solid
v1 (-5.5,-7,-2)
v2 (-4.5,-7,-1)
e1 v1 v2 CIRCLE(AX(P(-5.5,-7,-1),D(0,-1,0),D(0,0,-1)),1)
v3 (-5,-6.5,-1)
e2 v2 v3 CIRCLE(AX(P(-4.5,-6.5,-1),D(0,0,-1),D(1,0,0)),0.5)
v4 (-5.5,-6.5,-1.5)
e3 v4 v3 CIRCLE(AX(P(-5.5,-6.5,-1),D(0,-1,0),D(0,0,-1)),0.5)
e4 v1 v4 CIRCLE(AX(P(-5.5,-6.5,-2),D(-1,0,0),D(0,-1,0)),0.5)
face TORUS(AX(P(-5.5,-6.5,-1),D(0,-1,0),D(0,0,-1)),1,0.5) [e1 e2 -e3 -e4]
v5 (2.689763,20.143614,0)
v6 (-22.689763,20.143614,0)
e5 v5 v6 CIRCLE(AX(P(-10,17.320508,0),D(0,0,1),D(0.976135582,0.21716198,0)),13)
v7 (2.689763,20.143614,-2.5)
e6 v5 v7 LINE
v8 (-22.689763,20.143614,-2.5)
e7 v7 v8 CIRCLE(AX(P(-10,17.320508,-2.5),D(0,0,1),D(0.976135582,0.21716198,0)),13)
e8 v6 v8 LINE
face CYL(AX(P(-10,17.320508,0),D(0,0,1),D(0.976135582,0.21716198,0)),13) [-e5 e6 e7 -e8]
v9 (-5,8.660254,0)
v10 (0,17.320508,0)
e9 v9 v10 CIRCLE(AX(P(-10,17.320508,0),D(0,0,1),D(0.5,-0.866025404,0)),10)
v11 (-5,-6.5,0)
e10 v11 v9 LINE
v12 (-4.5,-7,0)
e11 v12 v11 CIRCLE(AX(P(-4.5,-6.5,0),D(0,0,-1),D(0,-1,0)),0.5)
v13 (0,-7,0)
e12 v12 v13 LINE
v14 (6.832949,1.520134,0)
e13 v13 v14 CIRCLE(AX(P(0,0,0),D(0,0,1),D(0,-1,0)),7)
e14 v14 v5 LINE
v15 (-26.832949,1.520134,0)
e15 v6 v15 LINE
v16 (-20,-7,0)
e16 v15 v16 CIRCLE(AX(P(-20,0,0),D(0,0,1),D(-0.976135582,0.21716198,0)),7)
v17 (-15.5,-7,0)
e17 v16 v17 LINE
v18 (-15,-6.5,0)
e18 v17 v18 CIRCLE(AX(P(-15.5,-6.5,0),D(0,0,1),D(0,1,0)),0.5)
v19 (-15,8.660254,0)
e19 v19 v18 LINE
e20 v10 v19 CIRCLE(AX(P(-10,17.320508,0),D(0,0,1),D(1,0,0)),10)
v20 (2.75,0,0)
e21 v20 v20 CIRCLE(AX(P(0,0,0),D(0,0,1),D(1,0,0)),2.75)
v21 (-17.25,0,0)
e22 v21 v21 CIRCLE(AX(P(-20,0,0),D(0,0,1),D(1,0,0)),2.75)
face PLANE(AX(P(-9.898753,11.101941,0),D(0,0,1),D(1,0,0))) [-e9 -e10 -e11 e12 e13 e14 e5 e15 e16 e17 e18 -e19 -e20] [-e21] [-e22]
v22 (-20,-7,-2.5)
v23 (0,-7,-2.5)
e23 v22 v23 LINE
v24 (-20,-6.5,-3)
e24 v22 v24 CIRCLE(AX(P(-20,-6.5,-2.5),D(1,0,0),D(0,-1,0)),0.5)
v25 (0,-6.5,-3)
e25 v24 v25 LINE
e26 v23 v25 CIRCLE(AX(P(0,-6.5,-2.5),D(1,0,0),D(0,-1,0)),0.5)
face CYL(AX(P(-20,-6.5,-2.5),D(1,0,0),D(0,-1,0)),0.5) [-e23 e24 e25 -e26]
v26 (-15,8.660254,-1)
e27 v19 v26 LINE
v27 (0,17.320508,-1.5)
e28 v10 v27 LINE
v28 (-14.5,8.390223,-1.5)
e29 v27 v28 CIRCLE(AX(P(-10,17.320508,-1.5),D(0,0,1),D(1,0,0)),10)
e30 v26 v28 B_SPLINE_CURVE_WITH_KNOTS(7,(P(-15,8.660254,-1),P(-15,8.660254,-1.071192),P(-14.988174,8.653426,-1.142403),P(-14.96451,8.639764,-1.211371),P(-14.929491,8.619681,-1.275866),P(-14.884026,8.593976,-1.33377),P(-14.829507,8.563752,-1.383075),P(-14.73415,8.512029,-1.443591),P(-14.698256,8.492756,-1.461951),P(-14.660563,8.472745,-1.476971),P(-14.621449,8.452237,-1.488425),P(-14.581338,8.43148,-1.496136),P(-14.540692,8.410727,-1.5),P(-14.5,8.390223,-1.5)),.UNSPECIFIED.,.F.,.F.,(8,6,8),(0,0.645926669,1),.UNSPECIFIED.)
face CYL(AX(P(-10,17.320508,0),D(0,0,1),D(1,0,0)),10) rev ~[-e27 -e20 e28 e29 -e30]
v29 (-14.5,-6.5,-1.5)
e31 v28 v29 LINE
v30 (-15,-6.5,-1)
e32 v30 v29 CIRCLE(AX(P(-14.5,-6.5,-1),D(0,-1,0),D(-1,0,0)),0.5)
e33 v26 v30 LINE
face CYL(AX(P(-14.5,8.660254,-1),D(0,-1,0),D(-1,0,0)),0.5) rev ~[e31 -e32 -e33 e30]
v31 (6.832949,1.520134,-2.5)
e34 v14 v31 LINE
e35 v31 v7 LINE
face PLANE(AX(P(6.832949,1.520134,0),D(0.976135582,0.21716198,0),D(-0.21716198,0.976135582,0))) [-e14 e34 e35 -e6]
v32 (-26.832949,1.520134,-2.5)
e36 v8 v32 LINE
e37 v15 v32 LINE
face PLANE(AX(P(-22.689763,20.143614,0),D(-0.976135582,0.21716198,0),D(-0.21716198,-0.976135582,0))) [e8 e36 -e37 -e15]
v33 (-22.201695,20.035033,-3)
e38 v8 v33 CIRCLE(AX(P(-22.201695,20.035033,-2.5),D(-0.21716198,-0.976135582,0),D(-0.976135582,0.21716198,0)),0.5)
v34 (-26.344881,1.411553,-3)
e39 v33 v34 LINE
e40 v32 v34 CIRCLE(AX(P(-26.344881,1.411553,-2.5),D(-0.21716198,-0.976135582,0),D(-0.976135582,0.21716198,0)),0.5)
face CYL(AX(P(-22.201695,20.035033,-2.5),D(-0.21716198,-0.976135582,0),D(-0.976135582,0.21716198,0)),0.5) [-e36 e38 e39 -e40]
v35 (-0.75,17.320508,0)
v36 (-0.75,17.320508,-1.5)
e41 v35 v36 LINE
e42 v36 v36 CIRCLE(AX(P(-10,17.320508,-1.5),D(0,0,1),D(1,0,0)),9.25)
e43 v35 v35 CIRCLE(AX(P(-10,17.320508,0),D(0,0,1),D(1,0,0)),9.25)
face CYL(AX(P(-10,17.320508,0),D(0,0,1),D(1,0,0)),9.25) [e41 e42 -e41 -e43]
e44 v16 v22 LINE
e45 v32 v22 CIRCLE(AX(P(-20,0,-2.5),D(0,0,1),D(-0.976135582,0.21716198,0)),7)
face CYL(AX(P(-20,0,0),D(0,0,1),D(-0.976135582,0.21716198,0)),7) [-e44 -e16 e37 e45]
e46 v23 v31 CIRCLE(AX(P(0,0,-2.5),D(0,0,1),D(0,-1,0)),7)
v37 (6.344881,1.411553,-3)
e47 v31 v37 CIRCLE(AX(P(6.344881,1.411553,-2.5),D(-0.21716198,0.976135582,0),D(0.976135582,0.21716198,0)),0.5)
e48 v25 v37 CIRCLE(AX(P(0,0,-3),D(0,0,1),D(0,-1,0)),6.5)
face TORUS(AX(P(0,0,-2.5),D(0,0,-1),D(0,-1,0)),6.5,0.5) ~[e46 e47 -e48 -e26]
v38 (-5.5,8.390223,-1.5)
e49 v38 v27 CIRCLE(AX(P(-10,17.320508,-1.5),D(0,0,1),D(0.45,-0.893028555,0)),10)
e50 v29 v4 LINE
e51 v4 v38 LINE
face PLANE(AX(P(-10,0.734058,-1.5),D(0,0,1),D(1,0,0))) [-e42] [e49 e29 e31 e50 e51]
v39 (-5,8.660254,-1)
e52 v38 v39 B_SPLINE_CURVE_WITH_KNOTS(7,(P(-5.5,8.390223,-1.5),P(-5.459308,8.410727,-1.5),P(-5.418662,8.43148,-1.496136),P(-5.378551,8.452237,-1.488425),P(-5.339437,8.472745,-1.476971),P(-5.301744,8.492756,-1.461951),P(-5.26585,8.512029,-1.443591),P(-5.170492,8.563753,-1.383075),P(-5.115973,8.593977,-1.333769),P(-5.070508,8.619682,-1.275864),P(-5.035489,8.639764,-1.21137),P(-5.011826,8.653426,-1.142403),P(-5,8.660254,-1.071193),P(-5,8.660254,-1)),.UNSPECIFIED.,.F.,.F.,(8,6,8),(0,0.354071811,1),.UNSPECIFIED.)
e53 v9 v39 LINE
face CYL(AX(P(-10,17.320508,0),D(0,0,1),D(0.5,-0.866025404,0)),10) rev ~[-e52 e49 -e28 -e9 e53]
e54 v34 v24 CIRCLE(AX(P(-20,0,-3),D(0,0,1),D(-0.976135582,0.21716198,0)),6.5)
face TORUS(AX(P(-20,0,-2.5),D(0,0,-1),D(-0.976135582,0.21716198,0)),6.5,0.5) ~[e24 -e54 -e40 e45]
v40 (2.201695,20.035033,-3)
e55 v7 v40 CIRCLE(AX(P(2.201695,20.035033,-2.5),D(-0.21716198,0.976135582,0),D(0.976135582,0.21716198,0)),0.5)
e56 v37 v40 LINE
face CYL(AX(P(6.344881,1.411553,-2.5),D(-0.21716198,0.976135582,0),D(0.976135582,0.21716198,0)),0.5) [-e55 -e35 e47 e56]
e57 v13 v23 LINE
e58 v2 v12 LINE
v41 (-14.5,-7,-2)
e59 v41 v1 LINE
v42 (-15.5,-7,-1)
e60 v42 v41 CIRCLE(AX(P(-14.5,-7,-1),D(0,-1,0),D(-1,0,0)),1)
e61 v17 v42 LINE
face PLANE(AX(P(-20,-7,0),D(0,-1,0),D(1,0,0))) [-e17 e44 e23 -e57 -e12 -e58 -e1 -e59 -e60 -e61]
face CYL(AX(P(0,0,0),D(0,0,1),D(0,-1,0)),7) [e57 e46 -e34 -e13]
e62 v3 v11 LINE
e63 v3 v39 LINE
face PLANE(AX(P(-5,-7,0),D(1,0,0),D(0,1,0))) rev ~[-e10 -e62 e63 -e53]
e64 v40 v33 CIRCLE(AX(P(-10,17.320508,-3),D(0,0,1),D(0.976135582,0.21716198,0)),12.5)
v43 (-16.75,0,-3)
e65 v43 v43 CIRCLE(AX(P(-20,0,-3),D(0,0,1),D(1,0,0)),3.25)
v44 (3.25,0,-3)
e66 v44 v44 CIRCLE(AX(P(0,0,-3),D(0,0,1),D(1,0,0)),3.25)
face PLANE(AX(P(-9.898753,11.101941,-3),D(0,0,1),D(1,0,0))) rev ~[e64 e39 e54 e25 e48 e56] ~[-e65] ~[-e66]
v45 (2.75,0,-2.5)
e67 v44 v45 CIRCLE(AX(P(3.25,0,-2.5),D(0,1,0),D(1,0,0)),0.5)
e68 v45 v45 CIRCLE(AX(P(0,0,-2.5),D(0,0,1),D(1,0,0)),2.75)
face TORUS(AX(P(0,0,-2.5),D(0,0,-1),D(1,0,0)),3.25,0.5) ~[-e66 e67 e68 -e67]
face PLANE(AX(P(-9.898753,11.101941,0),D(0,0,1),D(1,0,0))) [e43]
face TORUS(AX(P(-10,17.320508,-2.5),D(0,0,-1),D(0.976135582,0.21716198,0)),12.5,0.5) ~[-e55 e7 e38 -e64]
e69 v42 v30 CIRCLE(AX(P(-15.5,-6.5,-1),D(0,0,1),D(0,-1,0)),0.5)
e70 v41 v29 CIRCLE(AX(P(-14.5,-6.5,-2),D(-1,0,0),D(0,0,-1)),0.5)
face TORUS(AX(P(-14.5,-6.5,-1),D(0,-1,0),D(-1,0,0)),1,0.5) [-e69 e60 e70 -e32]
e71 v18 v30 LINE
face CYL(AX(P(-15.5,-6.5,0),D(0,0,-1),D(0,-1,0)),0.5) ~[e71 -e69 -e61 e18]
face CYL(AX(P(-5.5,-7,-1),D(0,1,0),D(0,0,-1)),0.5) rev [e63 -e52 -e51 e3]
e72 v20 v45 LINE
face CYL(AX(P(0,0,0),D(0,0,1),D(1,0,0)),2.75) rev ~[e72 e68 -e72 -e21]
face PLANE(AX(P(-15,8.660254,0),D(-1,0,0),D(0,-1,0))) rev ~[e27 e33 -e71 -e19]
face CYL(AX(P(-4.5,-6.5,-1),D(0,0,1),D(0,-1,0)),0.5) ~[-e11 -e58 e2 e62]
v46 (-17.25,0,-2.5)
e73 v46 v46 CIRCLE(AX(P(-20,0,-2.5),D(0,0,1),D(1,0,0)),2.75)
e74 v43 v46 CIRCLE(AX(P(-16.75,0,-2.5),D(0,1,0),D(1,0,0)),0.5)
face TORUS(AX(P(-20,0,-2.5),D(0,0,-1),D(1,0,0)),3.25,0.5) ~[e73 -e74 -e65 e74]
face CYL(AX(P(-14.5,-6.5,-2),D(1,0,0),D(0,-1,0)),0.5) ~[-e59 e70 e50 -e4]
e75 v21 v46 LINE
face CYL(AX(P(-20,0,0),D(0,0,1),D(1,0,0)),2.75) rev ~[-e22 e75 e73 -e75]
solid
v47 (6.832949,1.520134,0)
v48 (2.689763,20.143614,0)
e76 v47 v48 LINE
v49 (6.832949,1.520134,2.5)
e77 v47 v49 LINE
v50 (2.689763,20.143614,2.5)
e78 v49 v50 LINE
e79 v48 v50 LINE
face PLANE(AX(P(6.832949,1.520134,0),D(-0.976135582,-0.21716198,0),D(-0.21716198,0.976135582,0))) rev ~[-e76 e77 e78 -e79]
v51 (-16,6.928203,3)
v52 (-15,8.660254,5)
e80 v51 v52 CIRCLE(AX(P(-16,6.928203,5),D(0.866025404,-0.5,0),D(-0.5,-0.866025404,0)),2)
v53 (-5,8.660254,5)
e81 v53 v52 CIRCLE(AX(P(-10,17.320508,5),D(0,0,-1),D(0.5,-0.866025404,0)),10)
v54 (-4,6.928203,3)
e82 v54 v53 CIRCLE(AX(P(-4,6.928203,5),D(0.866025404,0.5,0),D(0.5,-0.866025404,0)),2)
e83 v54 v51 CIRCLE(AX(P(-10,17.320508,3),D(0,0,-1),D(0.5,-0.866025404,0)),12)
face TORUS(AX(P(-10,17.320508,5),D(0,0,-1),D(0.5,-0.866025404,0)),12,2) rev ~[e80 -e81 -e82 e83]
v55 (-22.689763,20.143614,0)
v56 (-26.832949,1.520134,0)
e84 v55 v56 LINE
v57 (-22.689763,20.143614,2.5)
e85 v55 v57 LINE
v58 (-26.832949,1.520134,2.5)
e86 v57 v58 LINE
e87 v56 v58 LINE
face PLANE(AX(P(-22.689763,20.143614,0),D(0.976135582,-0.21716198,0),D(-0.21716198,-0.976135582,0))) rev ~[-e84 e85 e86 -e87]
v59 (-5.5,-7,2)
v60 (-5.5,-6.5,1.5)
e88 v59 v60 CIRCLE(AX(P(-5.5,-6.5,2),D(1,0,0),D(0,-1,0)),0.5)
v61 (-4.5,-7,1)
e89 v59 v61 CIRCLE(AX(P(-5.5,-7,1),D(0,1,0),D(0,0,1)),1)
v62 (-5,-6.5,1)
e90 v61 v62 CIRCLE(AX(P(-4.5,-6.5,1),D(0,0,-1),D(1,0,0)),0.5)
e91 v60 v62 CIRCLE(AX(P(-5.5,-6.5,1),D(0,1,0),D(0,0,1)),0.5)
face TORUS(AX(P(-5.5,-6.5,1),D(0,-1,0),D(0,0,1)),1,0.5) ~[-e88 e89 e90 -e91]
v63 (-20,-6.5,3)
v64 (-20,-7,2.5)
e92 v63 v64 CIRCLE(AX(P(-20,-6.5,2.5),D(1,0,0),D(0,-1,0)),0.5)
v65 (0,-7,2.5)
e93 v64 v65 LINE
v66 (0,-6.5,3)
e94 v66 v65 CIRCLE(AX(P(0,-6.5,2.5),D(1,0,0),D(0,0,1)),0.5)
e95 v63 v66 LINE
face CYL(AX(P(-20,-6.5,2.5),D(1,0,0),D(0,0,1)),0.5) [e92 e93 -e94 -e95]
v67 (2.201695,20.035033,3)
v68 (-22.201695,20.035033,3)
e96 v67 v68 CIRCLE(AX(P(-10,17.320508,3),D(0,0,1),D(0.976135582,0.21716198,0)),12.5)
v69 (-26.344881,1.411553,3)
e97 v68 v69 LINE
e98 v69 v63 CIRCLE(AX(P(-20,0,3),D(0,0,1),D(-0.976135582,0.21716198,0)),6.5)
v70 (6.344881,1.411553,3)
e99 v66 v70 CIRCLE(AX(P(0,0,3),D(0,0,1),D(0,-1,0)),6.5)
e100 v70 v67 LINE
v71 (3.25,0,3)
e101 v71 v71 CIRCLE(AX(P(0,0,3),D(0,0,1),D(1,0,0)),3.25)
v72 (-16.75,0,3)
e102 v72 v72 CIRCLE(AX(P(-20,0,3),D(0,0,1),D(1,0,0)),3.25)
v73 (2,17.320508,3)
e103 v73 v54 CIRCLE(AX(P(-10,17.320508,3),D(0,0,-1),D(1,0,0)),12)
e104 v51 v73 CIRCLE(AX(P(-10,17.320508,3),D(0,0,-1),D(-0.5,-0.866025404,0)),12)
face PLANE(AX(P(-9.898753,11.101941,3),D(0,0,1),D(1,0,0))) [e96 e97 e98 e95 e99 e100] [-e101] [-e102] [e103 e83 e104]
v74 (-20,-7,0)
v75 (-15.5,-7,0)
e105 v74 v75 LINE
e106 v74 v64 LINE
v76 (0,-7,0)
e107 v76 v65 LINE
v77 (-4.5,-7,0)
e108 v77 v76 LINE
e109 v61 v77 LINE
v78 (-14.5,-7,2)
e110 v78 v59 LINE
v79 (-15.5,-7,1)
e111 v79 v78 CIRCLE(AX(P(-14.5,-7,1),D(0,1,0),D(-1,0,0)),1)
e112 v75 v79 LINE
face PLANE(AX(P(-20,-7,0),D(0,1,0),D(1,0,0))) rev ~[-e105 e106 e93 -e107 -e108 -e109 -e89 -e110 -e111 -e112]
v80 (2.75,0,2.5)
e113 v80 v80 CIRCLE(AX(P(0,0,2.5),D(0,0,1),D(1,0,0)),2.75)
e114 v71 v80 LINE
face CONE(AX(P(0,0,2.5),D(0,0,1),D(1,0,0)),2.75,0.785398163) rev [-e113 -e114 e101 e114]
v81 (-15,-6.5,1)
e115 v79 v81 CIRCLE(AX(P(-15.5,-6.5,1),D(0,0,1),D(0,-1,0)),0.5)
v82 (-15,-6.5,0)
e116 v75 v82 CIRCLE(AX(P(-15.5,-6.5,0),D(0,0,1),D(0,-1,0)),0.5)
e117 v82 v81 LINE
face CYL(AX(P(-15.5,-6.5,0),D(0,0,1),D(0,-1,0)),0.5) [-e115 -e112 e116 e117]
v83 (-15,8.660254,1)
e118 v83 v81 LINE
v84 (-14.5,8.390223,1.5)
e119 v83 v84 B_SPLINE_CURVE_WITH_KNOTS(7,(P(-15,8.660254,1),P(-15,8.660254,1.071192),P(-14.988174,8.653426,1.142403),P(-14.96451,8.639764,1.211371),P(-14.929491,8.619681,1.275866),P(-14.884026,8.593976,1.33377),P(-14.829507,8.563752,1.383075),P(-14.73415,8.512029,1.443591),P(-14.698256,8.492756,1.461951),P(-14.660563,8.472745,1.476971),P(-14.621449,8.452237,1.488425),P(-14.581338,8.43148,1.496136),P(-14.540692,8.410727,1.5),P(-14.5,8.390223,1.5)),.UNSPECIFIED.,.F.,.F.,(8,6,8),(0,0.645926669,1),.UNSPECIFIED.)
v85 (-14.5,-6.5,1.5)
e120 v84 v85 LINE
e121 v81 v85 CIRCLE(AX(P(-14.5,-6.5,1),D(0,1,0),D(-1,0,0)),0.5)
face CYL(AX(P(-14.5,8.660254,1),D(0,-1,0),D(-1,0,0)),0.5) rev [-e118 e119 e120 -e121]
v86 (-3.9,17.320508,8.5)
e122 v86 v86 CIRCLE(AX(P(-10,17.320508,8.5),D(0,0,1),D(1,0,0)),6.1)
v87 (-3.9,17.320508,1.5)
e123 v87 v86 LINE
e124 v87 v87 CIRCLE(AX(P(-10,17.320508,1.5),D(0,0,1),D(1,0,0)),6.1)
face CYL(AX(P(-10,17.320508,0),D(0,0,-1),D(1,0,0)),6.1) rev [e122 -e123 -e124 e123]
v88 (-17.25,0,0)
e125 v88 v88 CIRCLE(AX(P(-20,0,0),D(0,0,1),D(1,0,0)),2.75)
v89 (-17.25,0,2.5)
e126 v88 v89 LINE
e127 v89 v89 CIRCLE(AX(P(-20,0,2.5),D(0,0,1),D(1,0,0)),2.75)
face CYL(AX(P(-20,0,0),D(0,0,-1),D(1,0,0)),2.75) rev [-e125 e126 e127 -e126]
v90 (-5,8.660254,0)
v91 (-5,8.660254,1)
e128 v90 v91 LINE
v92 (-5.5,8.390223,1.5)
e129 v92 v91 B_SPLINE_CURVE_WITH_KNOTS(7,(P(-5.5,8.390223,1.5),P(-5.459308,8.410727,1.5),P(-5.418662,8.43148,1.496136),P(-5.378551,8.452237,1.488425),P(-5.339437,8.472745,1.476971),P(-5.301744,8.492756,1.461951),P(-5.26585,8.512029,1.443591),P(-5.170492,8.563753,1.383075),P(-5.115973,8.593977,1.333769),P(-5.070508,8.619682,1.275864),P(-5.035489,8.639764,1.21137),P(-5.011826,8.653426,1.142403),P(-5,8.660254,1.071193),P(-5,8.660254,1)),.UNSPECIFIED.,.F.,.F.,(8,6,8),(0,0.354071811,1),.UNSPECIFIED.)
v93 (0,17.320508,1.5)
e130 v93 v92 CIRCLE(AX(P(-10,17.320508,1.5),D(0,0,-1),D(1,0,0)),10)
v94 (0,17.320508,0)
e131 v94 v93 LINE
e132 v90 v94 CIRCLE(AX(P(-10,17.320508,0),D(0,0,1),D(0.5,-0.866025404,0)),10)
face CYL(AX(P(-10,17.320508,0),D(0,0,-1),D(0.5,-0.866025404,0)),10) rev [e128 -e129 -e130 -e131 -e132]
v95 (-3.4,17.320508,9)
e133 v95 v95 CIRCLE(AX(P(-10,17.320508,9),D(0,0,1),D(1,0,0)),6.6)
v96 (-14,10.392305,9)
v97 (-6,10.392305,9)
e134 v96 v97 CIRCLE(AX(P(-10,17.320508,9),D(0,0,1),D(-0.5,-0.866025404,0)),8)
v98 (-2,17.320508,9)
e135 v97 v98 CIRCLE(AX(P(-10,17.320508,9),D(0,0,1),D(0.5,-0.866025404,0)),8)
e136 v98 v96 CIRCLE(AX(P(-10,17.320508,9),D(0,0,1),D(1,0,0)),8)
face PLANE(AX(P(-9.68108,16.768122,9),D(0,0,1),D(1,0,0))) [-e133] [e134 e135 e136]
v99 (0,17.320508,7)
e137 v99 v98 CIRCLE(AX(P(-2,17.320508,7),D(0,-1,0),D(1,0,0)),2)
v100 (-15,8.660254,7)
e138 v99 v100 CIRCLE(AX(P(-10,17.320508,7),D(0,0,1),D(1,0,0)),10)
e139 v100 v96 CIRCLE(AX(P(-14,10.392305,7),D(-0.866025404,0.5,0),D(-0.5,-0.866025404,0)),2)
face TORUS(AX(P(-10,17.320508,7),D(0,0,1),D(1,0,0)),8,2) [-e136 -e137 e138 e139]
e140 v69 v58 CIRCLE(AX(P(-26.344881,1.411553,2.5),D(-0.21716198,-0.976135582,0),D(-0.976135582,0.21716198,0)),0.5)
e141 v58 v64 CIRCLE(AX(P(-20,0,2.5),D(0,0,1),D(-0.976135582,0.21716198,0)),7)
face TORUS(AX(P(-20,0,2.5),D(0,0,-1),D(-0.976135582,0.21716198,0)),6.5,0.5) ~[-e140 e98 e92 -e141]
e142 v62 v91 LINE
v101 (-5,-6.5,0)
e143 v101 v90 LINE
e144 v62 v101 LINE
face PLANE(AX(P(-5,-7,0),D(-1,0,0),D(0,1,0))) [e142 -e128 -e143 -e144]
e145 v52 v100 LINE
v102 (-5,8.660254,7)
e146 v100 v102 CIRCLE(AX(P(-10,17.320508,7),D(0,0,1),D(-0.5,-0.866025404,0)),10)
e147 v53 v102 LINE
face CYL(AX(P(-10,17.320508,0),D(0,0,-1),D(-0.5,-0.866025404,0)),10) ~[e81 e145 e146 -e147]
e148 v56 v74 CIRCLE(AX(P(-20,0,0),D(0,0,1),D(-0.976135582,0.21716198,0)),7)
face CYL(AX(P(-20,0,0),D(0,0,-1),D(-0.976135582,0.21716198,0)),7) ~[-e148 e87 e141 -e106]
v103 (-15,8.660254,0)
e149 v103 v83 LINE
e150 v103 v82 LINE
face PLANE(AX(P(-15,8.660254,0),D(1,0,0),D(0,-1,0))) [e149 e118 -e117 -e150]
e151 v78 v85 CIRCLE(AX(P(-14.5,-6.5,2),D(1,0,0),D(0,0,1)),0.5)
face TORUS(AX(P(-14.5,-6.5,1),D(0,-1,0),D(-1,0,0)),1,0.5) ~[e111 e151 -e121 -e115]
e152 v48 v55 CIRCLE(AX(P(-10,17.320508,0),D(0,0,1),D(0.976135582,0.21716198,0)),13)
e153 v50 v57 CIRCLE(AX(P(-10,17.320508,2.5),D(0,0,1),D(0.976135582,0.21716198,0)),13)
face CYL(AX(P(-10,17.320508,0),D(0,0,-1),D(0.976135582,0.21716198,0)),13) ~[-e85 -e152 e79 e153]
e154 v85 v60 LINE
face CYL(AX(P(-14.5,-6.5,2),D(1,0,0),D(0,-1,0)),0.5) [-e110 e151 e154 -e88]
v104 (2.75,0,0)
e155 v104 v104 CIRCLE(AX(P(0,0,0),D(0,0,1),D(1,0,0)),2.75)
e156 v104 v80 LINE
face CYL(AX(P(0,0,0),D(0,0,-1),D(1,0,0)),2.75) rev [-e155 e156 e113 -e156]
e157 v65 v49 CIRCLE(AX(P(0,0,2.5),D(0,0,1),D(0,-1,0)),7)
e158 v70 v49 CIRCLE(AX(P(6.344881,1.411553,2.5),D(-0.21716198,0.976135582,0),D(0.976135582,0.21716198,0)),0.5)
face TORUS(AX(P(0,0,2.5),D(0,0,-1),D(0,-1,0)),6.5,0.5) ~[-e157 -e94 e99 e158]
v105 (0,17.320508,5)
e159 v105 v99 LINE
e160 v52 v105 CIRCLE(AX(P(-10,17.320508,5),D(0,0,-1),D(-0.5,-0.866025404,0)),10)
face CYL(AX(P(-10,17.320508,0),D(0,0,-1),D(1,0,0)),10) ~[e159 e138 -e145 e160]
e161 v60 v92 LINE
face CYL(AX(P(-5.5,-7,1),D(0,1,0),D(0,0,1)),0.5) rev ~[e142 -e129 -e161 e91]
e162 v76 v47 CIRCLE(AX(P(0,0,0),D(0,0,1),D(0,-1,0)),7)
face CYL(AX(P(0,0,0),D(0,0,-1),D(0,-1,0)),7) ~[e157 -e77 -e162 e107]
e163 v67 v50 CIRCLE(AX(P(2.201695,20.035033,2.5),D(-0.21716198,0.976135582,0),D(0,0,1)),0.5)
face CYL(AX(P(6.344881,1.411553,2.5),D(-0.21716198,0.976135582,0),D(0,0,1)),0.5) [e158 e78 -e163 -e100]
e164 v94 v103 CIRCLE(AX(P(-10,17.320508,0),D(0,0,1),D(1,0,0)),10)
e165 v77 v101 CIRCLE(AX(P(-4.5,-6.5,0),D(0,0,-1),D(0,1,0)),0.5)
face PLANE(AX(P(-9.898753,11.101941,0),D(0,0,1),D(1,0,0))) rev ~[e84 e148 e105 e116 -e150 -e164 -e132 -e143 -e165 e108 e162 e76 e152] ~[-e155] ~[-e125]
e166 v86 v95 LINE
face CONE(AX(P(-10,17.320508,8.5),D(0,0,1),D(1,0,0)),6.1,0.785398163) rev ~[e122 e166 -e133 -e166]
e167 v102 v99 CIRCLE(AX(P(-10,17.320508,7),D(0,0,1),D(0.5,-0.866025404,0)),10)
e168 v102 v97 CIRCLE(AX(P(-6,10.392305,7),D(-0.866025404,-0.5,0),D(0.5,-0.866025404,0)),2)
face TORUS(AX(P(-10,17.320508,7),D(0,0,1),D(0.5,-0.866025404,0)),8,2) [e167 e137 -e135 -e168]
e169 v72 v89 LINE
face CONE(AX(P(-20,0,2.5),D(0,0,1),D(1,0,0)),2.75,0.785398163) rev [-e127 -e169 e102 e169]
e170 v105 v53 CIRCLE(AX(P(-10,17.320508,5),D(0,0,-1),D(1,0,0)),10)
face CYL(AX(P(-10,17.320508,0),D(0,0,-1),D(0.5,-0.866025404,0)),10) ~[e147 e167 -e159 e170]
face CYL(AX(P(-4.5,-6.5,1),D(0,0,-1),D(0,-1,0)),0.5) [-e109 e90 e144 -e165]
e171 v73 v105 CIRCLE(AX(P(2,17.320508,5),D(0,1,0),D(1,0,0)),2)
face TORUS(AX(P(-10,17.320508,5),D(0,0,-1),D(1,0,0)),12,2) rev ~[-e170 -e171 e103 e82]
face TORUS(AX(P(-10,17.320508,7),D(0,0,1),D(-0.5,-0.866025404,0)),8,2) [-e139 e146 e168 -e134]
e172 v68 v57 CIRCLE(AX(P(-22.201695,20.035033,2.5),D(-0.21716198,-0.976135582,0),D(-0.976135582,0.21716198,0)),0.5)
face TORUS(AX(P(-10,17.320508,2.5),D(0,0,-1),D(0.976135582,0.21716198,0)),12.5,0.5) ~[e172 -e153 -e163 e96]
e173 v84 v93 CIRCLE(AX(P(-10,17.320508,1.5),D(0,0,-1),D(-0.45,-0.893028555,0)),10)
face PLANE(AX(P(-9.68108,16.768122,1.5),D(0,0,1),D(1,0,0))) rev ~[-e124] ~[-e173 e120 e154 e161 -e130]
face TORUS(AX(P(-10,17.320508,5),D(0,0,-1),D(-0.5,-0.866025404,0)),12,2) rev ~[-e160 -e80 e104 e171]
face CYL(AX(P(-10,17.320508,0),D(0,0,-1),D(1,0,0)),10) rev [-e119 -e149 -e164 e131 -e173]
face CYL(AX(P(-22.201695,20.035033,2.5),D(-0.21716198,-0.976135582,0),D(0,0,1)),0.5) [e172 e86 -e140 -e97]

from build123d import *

# Parameters (mm, degrees)
F0_R      = 2.75
F0_R_2    = 9.25
F1_DEPTH  = 3
F0_R_3    = 6.1
F2_DEPTH  = 9
F3_DEPTH  = 1.5
F4_R      = 2
F5_SIZE   = 0.5
F0_R_4    = 5
F6_DEPTH  = 3
F7_DEPTH  = 1.5
F8_F1_R   = 0.5
F8_F2_R   = 0.5
F8_F3_R   = 0.5
F8_2_F1_R = 0.5
F8_2_F2_R = 0.5
F8_2_F3_R = 0.5


with BuildPart() as f1:
    # F0 (on Top) → F1 (new body)
    with BuildSketch(Plane.XY):
        with BuildLine():
            ThreePointArc((-15, 8.6602540378), (-15, 25.9807621135), (0, 17.3205080757))
            ThreePointArc((0, 17.3205080757), (-1.3397459622, 12.3205080757), (-5, 8.6602540378))
            Line((-5, 8.6602540378), (-5, -7))
            Line((-5, -7), (0, -7))
            ThreePointArc((0, -7), (5.4608120733, -4.3794441999), (6.8329490747, 1.520133857))
            Line((6.8329490747, 1.520133857), (2.6897625672, 20.1436138101))
            ThreePointArc((2.6897625672, 20.1436138101), (-10, 30.3205080757), (-22.6897625672, 20.1436138101))
            Line((-22.6897625672, 20.1436138101), (-26.8329490747, 1.520133857))
            ThreePointArc((-26.8329490747, 1.520133857), (-25.4608120733, -4.3794441999), (-20, -7))
            Line((-20, -7), (-15, -7))
            Line((-15, -7), (-15, 8.6602540378))
        make_face()
        with Locations((-20, 0)):
            Circle(F0_R, mode=Mode.SUBTRACT)
        Circle(F0_R, mode=Mode.SUBTRACT)
        with BuildLine():
            ThreePointArc((-5, 8.6602540378), (-1.3397459622, 12.3205080757), (0, 17.3205080757))
            ThreePointArc((0, 17.3205080757), (-15, 25.9807621135), (-15, 8.6602540378))
            ThreePointArc((-15, 8.6602540378), (-10, 7.3205080757), (-5, 8.6602540378))
        make_face()
        with Locations((-10, 17.3205080757)):
            Circle(F0_R_2, mode=Mode.SUBTRACT)
        with BuildLine():
            ThreePointArc((-5, 8.6602540378), (-10, 7.3205080757), (-15, 8.6602540378))
            Line((-15, 8.6602540378), (-15, -7))
            Line((-15, -7), (-5, -7))
            Line((-5, -7), (-5, 8.6602540378))
        make_face()
    extrude(amount=F1_DEPTH)

    # F0 (on Top) → F2 (join)
    with BuildSketch(Plane.XY):
        with BuildLine():
            ThreePointArc((-5, 8.6602540378), (-1.3397459622, 12.3205080757), (0, 17.3205080757))
            ThreePointArc((0, 17.3205080757), (-15, 25.9807621135), (-15, 8.6602540378))
            ThreePointArc((-15, 8.6602540378), (-10, 7.3205080757), (-5, 8.6602540378))
        make_face()
        with Locations((-10, 17.3205080757)):
            Circle(F0_R_2, mode=Mode.SUBTRACT)
        with Locations((-10, 17.3205080757)):
            Circle(F0_R_2)
        with Locations((-10, 17.3205080757)):
            Circle(F0_R_3, mode=Mode.SUBTRACT)
    extrude(amount=F2_DEPTH)

    # F0 (on Top) → F3 (cut)
    with BuildSketch(Plane.XY):
        with BuildLine():
            ThreePointArc((-5, 8.6602540378), (-1.3397459622, 12.3205080757), (0, 17.3205080757))
            ThreePointArc((0, 17.3205080757), (-15, 25.9807621135), (-15, 8.6602540378))
            ThreePointArc((-15, 8.6602540378), (-10, 7.3205080757), (-5, 8.6602540378))
        make_face()
        with Locations((-10, 17.3205080757)):
            Circle(F0_R_2, mode=Mode.SUBTRACT)
        with Locations((-10, 17.3205080757)):
            Circle(F0_R_2)
        with Locations((-10, 17.3205080757)):
            Circle(F0_R_3, mode=Mode.SUBTRACT)
        with BuildLine():
            ThreePointArc((-5, 8.6602540378), (-10, 7.3205080757), (-15, 8.6602540378))
            Line((-15, 8.6602540378), (-15, -7))
            Line((-15, -7), (-5, -7))
            Line((-5, -7), (-5, 8.6602540378))
        make_face()
    extrude(amount=F3_DEPTH, mode=Mode.SUBTRACT)

    # F4
    f4_edges = [f1.edges().sort_by_distance(p)[0] for p in [
        (-20, 17.320508, 3),
        (-20, 17.320508, 9),
    ]]
    fillet(f4_edges, radius=F4_R)

    # F5
    f5_edges = [f1.edges().sort_by_distance(p)[0] for p in [
        (-16.1, 17.320508, 9),
        (-22.75, 0, 3),
        (-2.75, 0, 3),
    ]]
    chamfer(f5_edges, length=F5_SIZE)

    # F8: fillet of radius 0.5 on 10 edges, made by hand

    # F8_f1
    f8_f1_edges = [f1.edges().sort_by_distance(p)[0] for p in [
        (-5, 0.8301270189, 1.5),
        (-15, 0.8301270189, 1.5),
    ]]
    fillet(f8_f1_edges, radius=F8_F1_R)

    # F8_f2
    f8_f2_edges = [f1.edges().sort_by_distance(p)[0] for p in [
        (-25.4608120733, -4.3794441999, 3),
        (-24.7613558209, 10.8318738336, 3),
        (-10, 30.3205080757, 3),
        (4.7613558209, 10.8318738336, 3),
        (-10, -7, 3),
        (5.4608120733, -4.3794441999, 3),
    ]]
    fillet(f8_f2_edges, radius=F8_F2_R)

    # F8_f3
    f8_f3_edges = [f1.edges().sort_by_distance(p)[0] for p in [
        (-15, -7, 0.5),
        (-10, -7, 1.5),
        (-14.8535533906, -7, 1.3535533906),
        (-5.1464466094, -7, 1.3535533906),
    ]]
    fillet(f8_f3_edges, radius=F8_F3_R)


with BuildPart() as f6:
    # F0 (on Top) → F6 (new body)
    with BuildSketch(Plane.XY):
        with BuildLine():
            ThreePointArc((-15, 8.6602540378), (-15, 25.9807621135), (0, 17.3205080757))
            ThreePointArc((0, 17.3205080757), (-1.3397459622, 12.3205080757), (-5, 8.6602540378))
            Line((-5, 8.6602540378), (-5, -7))
            Line((-5, -7), (0, -7))
            ThreePointArc((0, -7), (5.4608120733, -4.3794441999), (6.8329490747, 1.520133857))
            Line((6.8329490747, 1.520133857), (2.6897625672, 20.1436138101))
            ThreePointArc((2.6897625672, 20.1436138101), (-10, 30.3205080757), (-22.6897625672, 20.1436138101))
            Line((-22.6897625672, 20.1436138101), (-26.8329490747, 1.520133857))
            ThreePointArc((-26.8329490747, 1.520133857), (-25.4608120733, -4.3794441999), (-20, -7))
            Line((-20, -7), (-15, -7))
            Line((-15, -7), (-15, 8.6602540378))
        make_face()
        with Locations((-20, 0)):
            Circle(F0_R, mode=Mode.SUBTRACT)
        Circle(F0_R, mode=Mode.SUBTRACT)
        with BuildLine():
            ThreePointArc((-5, 8.6602540378), (-1.3397459622, 12.3205080757), (0, 17.3205080757))
            ThreePointArc((0, 17.3205080757), (-15, 25.9807621135), (-15, 8.6602540378))
            ThreePointArc((-15, 8.6602540378), (-10, 7.3205080757), (-5, 8.6602540378))
        make_face()
        with Locations((-10, 17.3205080757)):
            Circle(F0_R_2, mode=Mode.SUBTRACT)
        with Locations((-10, 17.3205080757)):
            Circle(F0_R_2)
        with Locations((-10, 17.3205080757)):
            Circle(F0_R_3, mode=Mode.SUBTRACT)
        with BuildLine():
            ThreePointArc((-5, 8.6602540378), (-10, 7.3205080757), (-15, 8.6602540378))
            Line((-15, 8.6602540378), (-15, -7))
            Line((-15, -7), (-5, -7))
            Line((-5, -7), (-5, 8.6602540378))
        make_face()
        with Locations((-10, 17.3205080757)):
            Circle(F0_R_3)
        with Locations((-10, 17.3205080757)):
            Circle(F0_R_4, mode=Mode.SUBTRACT)
        with Locations((-10, 17.3205080757)):
            Circle(F0_R_4)
    extrude(amount=-F6_DEPTH)

    # F0 (on Top) → F7 (cut)
    with BuildSketch(Plane.XY):
        with BuildLine():
            ThreePointArc((-5, 8.6602540378), (-10, 7.3205080757), (-15, 8.6602540378))
            Line((-15, 8.6602540378), (-15, -7))
            Line((-15, -7), (-5, -7))
            Line((-5, -7), (-5, 8.6602540378))
        make_face()
        with BuildLine():
            ThreePointArc((-5, 8.6602540378), (-1.3397459622, 12.3205080757), (0, 17.3205080757))
            ThreePointArc((0, 17.3205080757), (-15, 25.9807621135), (-15, 8.6602540378))
            ThreePointArc((-15, 8.6602540378), (-10, 7.3205080757), (-5, 8.6602540378))
        make_face()
        with Locations((-10, 17.3205080757)):
            Circle(F0_R_2, mode=Mode.SUBTRACT)
    extrude(amount=-F7_DEPTH, mode=Mode.SUBTRACT)

    # F8#2: fillet of radius 0.5 on 12 edges, made by hand

    # F8_2_f1
    f8_2_f1_edges = [f6.edges().sort_by_distance(p)[0] for p in [
        (-15, 0.8301270189, -1.5),
        (-5, 0.8301270189, -1.5),
    ]]
    fillet(f8_2_f1_edges, radius=F8_2_F1_R)

    # F8_2_f2
    f8_2_f2_edges = [f6.edges().sort_by_distance(p)[0] for p in [
        (-24.7613558209, 10.8318738336, -3),
        (-25.4608120733, -4.3794441999, -3),
        (-10, -7, -3),
        (5.4608120733, -4.3794441999, -3),
        (4.7613558209, 10.8318738336, -3),
        (-10, 30.3205080757, -3),
        (-22.75, 0, -3),
        (-2.75, 0, -3),
    ]]
    fillet(f8_2_f2_edges, radius=F8_2_F2_R)

    # F8_2_f3
    f8_2_f3_edges = [f6.edges().sort_by_distance(p)[0] for p in [
        (-15, -7, -0.5),
        (-10, -7, -1.5),
        (-14.8535533906, -7, -1.3535533906),
        (-5.1464466094, -7, -1.3535533906),
    ]]
    fillet(f8_2_f3_edges, radius=F8_2_F3_R)


solid = Compound([f1.part, f6.part])
